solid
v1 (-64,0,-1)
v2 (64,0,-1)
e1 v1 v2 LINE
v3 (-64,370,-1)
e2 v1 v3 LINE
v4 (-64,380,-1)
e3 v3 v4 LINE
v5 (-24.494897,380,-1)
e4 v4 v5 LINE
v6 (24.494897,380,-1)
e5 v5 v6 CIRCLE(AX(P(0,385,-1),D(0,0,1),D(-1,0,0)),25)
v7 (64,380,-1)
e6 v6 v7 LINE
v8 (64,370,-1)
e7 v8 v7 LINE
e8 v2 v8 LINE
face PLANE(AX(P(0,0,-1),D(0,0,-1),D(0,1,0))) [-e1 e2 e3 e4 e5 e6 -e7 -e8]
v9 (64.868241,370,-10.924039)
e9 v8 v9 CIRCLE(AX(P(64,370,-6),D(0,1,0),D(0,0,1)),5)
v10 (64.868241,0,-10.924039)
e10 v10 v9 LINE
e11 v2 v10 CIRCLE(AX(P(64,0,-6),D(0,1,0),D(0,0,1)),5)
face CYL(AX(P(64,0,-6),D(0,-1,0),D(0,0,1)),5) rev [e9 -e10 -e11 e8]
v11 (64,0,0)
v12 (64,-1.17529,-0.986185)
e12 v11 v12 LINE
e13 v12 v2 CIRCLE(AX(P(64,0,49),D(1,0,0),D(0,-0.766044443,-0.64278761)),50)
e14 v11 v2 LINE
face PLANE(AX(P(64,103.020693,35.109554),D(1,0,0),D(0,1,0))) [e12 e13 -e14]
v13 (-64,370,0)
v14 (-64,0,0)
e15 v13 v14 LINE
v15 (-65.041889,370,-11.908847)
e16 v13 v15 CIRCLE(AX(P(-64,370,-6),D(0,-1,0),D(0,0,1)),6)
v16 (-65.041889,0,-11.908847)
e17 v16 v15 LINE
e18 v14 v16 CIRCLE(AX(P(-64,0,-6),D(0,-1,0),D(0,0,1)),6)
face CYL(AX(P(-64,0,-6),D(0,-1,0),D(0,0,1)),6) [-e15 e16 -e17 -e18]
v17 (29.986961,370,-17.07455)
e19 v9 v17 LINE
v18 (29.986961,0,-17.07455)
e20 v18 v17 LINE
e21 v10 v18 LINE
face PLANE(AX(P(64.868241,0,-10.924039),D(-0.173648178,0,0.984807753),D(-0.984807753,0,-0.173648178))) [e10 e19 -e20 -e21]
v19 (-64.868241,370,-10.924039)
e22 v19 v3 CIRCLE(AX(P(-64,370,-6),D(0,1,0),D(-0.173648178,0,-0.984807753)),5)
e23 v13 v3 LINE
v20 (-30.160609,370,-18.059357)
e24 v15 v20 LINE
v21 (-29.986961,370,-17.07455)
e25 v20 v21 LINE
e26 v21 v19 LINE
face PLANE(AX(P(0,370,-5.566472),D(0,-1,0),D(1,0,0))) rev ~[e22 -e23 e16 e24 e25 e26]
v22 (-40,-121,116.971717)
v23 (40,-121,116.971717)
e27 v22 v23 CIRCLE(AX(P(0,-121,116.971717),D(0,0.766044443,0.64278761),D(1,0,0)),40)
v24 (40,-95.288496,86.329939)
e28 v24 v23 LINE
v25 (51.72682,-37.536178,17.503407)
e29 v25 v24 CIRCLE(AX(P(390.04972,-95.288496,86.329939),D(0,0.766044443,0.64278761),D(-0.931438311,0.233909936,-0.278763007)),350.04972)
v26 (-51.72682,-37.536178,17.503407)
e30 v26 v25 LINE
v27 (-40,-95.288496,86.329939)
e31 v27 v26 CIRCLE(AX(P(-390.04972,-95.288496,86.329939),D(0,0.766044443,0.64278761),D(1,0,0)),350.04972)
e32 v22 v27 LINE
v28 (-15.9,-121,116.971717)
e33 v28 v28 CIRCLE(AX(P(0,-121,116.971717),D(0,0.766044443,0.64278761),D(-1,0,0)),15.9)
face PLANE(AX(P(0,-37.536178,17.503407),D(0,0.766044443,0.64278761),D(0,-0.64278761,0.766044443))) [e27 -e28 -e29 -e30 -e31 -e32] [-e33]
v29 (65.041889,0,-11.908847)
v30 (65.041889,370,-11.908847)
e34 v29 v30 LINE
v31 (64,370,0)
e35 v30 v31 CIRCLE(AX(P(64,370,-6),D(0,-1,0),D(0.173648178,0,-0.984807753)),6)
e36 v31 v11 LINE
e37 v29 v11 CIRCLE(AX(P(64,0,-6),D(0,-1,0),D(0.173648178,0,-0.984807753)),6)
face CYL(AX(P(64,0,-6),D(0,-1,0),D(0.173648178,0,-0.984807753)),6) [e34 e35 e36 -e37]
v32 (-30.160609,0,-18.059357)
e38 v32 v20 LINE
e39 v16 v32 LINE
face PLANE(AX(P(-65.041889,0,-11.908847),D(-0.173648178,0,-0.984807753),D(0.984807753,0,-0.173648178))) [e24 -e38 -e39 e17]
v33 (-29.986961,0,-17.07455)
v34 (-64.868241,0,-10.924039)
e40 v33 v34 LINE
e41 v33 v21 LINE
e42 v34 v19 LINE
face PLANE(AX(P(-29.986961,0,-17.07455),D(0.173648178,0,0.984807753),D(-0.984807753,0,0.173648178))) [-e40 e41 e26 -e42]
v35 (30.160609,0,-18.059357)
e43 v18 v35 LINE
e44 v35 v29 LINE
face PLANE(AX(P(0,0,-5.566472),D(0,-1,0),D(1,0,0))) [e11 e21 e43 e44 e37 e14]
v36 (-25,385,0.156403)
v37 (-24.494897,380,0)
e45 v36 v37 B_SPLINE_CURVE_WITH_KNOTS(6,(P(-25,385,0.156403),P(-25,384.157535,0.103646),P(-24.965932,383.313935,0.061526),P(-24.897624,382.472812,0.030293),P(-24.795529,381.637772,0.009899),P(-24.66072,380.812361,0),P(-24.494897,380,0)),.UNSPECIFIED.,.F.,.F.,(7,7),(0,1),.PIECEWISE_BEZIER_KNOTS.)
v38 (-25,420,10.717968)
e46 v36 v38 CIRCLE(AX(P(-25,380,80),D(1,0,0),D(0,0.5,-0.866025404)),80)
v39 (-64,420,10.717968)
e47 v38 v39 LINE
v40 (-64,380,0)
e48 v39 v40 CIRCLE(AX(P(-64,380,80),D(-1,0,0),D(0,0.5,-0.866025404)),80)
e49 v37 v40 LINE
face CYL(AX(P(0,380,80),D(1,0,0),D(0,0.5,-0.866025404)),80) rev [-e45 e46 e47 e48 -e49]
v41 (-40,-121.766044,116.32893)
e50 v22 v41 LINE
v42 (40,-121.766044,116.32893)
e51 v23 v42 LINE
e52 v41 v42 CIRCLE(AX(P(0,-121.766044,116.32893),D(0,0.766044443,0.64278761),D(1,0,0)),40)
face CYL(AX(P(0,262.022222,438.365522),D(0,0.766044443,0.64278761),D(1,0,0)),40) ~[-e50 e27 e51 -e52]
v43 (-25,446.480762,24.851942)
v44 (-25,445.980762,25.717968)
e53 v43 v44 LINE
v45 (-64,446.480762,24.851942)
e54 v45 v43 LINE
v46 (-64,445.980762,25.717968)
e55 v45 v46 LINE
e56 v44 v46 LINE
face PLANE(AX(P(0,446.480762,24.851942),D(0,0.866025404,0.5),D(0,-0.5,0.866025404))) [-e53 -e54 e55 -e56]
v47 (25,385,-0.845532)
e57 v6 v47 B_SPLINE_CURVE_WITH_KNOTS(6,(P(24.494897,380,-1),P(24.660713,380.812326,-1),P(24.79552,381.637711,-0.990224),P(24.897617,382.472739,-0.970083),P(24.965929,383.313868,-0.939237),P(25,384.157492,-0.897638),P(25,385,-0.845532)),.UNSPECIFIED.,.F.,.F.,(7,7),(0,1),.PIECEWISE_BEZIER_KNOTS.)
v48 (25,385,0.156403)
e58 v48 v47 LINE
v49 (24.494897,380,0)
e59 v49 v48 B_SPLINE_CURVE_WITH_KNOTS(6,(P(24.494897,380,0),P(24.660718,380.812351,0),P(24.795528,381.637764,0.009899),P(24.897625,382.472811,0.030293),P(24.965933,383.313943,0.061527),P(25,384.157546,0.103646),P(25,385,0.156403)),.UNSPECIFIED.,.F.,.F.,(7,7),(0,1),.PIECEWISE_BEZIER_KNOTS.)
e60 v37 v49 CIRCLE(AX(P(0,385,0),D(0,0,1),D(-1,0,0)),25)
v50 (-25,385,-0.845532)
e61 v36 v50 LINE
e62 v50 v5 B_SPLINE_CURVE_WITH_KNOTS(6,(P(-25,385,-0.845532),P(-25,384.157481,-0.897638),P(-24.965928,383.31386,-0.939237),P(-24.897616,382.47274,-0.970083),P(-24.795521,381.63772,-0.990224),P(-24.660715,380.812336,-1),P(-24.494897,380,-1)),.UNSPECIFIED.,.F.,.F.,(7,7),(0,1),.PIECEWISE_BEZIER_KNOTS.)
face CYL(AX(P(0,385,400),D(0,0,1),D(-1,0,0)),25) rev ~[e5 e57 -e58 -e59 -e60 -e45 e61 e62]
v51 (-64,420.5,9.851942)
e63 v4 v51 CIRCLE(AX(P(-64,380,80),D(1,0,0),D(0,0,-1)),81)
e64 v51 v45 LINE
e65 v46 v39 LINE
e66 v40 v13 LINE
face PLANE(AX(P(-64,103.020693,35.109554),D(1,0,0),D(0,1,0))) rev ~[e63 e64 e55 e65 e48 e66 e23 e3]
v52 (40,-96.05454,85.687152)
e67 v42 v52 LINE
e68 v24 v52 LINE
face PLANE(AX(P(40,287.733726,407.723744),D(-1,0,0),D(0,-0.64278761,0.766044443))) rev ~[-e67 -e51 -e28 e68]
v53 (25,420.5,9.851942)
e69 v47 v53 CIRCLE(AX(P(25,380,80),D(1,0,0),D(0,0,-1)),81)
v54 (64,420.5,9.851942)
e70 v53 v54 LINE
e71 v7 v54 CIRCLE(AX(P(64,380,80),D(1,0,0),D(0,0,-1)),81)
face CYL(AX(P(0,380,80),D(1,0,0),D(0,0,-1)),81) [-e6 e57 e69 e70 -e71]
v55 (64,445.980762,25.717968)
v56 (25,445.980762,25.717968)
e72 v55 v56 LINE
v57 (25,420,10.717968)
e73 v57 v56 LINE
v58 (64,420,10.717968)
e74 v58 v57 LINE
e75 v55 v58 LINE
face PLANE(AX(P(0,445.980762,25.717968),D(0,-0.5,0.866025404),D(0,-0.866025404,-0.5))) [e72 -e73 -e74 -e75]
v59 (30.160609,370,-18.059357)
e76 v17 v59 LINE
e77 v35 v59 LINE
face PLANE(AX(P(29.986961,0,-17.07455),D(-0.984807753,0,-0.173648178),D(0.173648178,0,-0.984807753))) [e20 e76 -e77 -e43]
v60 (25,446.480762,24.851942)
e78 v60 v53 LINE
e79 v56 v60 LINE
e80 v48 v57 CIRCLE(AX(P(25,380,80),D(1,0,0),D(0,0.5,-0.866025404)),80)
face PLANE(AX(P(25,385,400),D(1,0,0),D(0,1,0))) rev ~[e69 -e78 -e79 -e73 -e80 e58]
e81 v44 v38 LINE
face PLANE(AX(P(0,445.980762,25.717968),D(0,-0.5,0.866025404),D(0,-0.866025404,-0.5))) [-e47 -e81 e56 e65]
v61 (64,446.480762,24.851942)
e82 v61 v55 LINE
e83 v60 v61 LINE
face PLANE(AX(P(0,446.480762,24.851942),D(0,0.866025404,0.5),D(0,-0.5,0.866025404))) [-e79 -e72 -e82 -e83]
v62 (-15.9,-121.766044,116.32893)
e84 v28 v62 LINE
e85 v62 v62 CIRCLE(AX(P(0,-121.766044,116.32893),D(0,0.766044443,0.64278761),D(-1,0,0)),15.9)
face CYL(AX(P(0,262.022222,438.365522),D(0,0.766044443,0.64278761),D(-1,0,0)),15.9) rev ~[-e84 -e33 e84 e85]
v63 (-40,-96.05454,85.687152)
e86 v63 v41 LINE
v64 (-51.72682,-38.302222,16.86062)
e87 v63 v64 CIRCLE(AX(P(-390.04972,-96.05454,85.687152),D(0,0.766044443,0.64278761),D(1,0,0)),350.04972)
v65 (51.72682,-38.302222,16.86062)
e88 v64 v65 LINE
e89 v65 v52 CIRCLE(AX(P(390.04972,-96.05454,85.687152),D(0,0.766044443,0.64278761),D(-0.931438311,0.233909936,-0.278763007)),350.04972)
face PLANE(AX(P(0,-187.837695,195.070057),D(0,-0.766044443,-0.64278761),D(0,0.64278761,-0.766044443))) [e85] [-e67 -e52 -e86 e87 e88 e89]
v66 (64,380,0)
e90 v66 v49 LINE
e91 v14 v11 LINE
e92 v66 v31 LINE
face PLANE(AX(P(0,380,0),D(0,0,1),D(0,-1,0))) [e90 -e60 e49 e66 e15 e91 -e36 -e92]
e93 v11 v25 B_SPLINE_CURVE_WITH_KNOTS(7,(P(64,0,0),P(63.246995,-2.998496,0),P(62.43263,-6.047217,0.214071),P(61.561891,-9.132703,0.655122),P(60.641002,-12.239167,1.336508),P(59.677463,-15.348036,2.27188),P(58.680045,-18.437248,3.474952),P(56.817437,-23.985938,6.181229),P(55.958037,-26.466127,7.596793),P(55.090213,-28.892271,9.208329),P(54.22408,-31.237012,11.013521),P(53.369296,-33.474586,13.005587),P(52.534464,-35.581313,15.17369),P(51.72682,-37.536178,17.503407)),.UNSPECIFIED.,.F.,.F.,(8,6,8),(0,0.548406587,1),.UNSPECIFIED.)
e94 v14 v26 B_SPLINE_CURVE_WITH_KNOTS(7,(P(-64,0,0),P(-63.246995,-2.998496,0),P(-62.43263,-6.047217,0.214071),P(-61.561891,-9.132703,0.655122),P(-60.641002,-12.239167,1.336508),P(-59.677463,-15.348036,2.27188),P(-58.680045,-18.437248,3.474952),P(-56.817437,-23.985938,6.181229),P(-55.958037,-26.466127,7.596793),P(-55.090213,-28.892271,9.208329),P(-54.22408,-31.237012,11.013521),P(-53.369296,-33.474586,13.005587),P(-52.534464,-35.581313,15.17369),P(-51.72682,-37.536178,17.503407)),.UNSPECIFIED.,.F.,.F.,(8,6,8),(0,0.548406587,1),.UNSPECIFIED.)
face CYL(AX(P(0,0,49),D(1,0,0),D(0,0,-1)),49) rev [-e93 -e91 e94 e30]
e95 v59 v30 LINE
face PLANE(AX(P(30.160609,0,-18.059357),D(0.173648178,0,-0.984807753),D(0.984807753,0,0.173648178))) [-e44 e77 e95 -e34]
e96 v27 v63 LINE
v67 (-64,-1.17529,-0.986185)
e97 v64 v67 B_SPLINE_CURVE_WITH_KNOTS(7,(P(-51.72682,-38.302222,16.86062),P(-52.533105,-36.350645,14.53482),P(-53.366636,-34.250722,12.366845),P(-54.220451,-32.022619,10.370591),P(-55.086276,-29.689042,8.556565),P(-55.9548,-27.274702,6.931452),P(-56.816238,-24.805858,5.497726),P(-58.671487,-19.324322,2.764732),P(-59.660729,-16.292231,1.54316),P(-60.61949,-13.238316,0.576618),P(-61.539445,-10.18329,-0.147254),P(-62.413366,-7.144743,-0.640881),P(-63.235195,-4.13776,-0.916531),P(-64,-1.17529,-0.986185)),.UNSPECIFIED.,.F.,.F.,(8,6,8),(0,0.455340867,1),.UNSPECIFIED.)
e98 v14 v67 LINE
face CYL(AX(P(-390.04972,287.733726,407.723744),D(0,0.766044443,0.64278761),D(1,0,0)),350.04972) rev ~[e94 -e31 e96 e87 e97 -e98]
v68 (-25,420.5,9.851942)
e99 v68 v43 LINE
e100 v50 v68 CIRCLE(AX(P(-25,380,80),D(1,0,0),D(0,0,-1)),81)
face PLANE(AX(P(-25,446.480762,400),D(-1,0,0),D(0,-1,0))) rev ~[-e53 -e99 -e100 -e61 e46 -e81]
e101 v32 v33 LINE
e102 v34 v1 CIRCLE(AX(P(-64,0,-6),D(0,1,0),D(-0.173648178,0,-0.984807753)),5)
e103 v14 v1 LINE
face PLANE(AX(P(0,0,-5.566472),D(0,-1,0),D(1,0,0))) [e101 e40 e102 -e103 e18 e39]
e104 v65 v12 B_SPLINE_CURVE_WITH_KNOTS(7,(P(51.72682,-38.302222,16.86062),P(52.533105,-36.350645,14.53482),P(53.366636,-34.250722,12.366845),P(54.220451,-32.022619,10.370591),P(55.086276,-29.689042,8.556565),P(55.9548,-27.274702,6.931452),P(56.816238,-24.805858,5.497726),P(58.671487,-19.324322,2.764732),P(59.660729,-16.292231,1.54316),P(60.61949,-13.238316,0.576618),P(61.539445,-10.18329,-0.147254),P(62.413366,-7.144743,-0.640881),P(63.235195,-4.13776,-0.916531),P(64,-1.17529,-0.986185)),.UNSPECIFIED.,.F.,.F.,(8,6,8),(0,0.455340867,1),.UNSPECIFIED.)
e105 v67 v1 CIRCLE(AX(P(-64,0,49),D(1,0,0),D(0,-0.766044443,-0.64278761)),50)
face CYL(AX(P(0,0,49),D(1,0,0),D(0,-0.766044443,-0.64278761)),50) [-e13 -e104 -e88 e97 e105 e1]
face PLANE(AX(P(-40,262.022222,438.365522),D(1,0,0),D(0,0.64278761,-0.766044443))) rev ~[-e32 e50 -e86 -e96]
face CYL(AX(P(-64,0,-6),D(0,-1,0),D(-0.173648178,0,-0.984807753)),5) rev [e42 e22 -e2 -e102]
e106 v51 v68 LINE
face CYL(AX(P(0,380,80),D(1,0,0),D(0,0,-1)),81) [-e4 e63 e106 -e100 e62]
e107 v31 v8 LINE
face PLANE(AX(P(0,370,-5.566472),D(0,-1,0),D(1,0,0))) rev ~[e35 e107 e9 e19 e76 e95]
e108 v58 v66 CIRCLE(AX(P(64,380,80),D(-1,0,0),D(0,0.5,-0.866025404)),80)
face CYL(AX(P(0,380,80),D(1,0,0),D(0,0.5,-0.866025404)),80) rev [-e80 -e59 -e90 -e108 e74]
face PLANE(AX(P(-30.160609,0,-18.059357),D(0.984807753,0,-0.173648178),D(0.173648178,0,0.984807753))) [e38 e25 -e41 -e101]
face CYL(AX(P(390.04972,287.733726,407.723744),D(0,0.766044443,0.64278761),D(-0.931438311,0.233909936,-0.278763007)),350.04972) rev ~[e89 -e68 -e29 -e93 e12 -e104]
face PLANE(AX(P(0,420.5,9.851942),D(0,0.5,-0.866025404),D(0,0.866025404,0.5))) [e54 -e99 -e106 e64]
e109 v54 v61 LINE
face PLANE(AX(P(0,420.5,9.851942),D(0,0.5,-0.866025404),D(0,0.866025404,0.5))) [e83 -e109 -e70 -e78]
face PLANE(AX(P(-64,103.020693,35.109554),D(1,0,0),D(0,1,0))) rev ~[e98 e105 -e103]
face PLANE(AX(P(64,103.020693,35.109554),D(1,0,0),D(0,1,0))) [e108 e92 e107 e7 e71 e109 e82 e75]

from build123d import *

# Parameters (mm, degrees)
F1_DEPTH = 64
F3_DEPTH = 370
F6_DEPTH = 500
F8_R     = 15.9
F9_DEPTH = 600


# Not quite as in the source:
# - a feature names something its author has since deleted; it is built from what else it names


with BuildPart() as f1:
    # F0 (on Right) → F1 (new body, symmetric)
    with BuildSketch(Plane.YZ):
        with BuildLine():
            Line((380, 0), (0, 0))
            ThreePointArc((0, 0), (-20.7082948253, 4.5909184352), (-37.5361777128, 17.5034071254))
            Line((-37.5361777128, 17.5034071254), (-121, 116.9717171877))
            Line((-121, 116.9717171877), (-187.1849916482, 195.8479187603))
            Line((-187.1849916482, 195.8479187603), (-187.8376952929, 195.0700568469))
            Line((-187.8376952929, 195.0700568469), (-128.3694552412, 124.1985681201))
            Line((-128.3694552412, 124.1985681201), (-38.3022221559, 16.8606195157))
            ThreePointArc((-38.3022221559, 16.8606195157), (-21.130913087, 3.6846106482), (0, -1))
            Line((0, -1), (380, -1))
            ThreePointArc((380, -1), (400.9643426533, 1.7600080706), (420.5, 9.8519422935))
            Line((420.5, 9.8519422935), (446.4807621135, 24.8519422935))
            Line((446.4807621135, 24.8519422935), (445.9807621135, 25.7179676972))
            Line((445.9807621135, 25.7179676972), (420, 10.7179676972))
            ThreePointArc((420, 10.7179676972), (400.7055236082, 2.7259338969), (380, 0))
        make_face()
    extrude(amount=F1_DEPTH, both=True)

    # F2 (on Front) → F3 (join)
    with BuildSketch(Plane.XZ):
        with BuildLine():
            ThreePointArc((65.041889066, -11.9088465181), (69.9771681886, -5.4770655435), (64, 0))
            Line((64, 0), (-64, 0))
            ThreePointArc((-64, 0), (-69.9771681886, -5.4770655435), (-65.041889066, -11.9088465181))
            Line((-65.041889066, -11.9088465181), (-30.1606090351, -18.0593573092))
            Line((-30.1606090351, -18.0593573092), (-29.9869608574, -17.0745495562))
            Line((-29.9869608574, -17.0745495562), (-64.8682408883, -10.9240387651))
            ThreePointArc((-64.8682408883, -10.9240387651), (-68.9809734905, -5.5642212863), (-64, -1))
            Line((-64, -1), (64, -1))
            ThreePointArc((64, -1), (68.9809734905, -5.5642212863), (64.8682408883, -10.9240387651))
            Line((64.8682408883, -10.9240387651), (29.9869608574, -17.0745495562))
            Line((29.9869608574, -17.0745495562), (30.1606090351, -18.0593573092))
            Line((30.1606090351, -18.0593573092), (65.041889066, -11.9088465181))
        make_face()
    extrude(amount=-F3_DEPTH)

    # F5 (on offset) → F6 (cut)
    with BuildSketch(Plane.XY.offset(400)):
        with BuildLine():
            Line((-25, 446.4807621135), (-25, 385))
            ThreePointArc((-25, 385), (0, 360), (25, 385))
            Line((25, 385), (25, 446.4807621135))
            Line((25, 446.4807621135), (-25, 446.4807621135))
        make_face()
    extrude(amount=-F6_DEPTH, mode=Mode.SUBTRACT)

    # F8 (on offset) → F9 (cut)
    with BuildSketch(Plane(origin=(0, 369.6138337955, 310.1428316158), x_dir=(-1, 0, 0), z_dir=(0, 0.7660444431, 0.6427876097))):
        with Locations((0, 167.3828347258)):
            Circle(F8_R)
        with BuildLine():
            ThreePointArc((-40, 167.3828347258), (0, 207.3828347258), (40, 167.3828347258))
            Line((40, 167.3828347258), (40, 127.3828347258))
            ThreePointArc((40, 127.3828347258), (46.052321998, 62.5708246837), (64, 0))
            Line((64, 0), (64, 37.5361777128))
            Line((64, 37.5361777128), (64, 270.3484032135))
            Line((64, 270.3484032135), (-64, 270.3484032135))
            Line((-64, 270.3484032135), (-64, 37.5361777128))
            Line((-64, 37.5361777128), (-64, 0))
            ThreePointArc((-64, 0), (-46.052321998, 62.5708246837), (-40, 127.3828347258))
            Line((-40, 127.3828347258), (-40, 167.3828347258))
        make_face()
    extrude(amount=-F9_DEPTH, mode=Mode.SUBTRACT)


solid = f1.part
